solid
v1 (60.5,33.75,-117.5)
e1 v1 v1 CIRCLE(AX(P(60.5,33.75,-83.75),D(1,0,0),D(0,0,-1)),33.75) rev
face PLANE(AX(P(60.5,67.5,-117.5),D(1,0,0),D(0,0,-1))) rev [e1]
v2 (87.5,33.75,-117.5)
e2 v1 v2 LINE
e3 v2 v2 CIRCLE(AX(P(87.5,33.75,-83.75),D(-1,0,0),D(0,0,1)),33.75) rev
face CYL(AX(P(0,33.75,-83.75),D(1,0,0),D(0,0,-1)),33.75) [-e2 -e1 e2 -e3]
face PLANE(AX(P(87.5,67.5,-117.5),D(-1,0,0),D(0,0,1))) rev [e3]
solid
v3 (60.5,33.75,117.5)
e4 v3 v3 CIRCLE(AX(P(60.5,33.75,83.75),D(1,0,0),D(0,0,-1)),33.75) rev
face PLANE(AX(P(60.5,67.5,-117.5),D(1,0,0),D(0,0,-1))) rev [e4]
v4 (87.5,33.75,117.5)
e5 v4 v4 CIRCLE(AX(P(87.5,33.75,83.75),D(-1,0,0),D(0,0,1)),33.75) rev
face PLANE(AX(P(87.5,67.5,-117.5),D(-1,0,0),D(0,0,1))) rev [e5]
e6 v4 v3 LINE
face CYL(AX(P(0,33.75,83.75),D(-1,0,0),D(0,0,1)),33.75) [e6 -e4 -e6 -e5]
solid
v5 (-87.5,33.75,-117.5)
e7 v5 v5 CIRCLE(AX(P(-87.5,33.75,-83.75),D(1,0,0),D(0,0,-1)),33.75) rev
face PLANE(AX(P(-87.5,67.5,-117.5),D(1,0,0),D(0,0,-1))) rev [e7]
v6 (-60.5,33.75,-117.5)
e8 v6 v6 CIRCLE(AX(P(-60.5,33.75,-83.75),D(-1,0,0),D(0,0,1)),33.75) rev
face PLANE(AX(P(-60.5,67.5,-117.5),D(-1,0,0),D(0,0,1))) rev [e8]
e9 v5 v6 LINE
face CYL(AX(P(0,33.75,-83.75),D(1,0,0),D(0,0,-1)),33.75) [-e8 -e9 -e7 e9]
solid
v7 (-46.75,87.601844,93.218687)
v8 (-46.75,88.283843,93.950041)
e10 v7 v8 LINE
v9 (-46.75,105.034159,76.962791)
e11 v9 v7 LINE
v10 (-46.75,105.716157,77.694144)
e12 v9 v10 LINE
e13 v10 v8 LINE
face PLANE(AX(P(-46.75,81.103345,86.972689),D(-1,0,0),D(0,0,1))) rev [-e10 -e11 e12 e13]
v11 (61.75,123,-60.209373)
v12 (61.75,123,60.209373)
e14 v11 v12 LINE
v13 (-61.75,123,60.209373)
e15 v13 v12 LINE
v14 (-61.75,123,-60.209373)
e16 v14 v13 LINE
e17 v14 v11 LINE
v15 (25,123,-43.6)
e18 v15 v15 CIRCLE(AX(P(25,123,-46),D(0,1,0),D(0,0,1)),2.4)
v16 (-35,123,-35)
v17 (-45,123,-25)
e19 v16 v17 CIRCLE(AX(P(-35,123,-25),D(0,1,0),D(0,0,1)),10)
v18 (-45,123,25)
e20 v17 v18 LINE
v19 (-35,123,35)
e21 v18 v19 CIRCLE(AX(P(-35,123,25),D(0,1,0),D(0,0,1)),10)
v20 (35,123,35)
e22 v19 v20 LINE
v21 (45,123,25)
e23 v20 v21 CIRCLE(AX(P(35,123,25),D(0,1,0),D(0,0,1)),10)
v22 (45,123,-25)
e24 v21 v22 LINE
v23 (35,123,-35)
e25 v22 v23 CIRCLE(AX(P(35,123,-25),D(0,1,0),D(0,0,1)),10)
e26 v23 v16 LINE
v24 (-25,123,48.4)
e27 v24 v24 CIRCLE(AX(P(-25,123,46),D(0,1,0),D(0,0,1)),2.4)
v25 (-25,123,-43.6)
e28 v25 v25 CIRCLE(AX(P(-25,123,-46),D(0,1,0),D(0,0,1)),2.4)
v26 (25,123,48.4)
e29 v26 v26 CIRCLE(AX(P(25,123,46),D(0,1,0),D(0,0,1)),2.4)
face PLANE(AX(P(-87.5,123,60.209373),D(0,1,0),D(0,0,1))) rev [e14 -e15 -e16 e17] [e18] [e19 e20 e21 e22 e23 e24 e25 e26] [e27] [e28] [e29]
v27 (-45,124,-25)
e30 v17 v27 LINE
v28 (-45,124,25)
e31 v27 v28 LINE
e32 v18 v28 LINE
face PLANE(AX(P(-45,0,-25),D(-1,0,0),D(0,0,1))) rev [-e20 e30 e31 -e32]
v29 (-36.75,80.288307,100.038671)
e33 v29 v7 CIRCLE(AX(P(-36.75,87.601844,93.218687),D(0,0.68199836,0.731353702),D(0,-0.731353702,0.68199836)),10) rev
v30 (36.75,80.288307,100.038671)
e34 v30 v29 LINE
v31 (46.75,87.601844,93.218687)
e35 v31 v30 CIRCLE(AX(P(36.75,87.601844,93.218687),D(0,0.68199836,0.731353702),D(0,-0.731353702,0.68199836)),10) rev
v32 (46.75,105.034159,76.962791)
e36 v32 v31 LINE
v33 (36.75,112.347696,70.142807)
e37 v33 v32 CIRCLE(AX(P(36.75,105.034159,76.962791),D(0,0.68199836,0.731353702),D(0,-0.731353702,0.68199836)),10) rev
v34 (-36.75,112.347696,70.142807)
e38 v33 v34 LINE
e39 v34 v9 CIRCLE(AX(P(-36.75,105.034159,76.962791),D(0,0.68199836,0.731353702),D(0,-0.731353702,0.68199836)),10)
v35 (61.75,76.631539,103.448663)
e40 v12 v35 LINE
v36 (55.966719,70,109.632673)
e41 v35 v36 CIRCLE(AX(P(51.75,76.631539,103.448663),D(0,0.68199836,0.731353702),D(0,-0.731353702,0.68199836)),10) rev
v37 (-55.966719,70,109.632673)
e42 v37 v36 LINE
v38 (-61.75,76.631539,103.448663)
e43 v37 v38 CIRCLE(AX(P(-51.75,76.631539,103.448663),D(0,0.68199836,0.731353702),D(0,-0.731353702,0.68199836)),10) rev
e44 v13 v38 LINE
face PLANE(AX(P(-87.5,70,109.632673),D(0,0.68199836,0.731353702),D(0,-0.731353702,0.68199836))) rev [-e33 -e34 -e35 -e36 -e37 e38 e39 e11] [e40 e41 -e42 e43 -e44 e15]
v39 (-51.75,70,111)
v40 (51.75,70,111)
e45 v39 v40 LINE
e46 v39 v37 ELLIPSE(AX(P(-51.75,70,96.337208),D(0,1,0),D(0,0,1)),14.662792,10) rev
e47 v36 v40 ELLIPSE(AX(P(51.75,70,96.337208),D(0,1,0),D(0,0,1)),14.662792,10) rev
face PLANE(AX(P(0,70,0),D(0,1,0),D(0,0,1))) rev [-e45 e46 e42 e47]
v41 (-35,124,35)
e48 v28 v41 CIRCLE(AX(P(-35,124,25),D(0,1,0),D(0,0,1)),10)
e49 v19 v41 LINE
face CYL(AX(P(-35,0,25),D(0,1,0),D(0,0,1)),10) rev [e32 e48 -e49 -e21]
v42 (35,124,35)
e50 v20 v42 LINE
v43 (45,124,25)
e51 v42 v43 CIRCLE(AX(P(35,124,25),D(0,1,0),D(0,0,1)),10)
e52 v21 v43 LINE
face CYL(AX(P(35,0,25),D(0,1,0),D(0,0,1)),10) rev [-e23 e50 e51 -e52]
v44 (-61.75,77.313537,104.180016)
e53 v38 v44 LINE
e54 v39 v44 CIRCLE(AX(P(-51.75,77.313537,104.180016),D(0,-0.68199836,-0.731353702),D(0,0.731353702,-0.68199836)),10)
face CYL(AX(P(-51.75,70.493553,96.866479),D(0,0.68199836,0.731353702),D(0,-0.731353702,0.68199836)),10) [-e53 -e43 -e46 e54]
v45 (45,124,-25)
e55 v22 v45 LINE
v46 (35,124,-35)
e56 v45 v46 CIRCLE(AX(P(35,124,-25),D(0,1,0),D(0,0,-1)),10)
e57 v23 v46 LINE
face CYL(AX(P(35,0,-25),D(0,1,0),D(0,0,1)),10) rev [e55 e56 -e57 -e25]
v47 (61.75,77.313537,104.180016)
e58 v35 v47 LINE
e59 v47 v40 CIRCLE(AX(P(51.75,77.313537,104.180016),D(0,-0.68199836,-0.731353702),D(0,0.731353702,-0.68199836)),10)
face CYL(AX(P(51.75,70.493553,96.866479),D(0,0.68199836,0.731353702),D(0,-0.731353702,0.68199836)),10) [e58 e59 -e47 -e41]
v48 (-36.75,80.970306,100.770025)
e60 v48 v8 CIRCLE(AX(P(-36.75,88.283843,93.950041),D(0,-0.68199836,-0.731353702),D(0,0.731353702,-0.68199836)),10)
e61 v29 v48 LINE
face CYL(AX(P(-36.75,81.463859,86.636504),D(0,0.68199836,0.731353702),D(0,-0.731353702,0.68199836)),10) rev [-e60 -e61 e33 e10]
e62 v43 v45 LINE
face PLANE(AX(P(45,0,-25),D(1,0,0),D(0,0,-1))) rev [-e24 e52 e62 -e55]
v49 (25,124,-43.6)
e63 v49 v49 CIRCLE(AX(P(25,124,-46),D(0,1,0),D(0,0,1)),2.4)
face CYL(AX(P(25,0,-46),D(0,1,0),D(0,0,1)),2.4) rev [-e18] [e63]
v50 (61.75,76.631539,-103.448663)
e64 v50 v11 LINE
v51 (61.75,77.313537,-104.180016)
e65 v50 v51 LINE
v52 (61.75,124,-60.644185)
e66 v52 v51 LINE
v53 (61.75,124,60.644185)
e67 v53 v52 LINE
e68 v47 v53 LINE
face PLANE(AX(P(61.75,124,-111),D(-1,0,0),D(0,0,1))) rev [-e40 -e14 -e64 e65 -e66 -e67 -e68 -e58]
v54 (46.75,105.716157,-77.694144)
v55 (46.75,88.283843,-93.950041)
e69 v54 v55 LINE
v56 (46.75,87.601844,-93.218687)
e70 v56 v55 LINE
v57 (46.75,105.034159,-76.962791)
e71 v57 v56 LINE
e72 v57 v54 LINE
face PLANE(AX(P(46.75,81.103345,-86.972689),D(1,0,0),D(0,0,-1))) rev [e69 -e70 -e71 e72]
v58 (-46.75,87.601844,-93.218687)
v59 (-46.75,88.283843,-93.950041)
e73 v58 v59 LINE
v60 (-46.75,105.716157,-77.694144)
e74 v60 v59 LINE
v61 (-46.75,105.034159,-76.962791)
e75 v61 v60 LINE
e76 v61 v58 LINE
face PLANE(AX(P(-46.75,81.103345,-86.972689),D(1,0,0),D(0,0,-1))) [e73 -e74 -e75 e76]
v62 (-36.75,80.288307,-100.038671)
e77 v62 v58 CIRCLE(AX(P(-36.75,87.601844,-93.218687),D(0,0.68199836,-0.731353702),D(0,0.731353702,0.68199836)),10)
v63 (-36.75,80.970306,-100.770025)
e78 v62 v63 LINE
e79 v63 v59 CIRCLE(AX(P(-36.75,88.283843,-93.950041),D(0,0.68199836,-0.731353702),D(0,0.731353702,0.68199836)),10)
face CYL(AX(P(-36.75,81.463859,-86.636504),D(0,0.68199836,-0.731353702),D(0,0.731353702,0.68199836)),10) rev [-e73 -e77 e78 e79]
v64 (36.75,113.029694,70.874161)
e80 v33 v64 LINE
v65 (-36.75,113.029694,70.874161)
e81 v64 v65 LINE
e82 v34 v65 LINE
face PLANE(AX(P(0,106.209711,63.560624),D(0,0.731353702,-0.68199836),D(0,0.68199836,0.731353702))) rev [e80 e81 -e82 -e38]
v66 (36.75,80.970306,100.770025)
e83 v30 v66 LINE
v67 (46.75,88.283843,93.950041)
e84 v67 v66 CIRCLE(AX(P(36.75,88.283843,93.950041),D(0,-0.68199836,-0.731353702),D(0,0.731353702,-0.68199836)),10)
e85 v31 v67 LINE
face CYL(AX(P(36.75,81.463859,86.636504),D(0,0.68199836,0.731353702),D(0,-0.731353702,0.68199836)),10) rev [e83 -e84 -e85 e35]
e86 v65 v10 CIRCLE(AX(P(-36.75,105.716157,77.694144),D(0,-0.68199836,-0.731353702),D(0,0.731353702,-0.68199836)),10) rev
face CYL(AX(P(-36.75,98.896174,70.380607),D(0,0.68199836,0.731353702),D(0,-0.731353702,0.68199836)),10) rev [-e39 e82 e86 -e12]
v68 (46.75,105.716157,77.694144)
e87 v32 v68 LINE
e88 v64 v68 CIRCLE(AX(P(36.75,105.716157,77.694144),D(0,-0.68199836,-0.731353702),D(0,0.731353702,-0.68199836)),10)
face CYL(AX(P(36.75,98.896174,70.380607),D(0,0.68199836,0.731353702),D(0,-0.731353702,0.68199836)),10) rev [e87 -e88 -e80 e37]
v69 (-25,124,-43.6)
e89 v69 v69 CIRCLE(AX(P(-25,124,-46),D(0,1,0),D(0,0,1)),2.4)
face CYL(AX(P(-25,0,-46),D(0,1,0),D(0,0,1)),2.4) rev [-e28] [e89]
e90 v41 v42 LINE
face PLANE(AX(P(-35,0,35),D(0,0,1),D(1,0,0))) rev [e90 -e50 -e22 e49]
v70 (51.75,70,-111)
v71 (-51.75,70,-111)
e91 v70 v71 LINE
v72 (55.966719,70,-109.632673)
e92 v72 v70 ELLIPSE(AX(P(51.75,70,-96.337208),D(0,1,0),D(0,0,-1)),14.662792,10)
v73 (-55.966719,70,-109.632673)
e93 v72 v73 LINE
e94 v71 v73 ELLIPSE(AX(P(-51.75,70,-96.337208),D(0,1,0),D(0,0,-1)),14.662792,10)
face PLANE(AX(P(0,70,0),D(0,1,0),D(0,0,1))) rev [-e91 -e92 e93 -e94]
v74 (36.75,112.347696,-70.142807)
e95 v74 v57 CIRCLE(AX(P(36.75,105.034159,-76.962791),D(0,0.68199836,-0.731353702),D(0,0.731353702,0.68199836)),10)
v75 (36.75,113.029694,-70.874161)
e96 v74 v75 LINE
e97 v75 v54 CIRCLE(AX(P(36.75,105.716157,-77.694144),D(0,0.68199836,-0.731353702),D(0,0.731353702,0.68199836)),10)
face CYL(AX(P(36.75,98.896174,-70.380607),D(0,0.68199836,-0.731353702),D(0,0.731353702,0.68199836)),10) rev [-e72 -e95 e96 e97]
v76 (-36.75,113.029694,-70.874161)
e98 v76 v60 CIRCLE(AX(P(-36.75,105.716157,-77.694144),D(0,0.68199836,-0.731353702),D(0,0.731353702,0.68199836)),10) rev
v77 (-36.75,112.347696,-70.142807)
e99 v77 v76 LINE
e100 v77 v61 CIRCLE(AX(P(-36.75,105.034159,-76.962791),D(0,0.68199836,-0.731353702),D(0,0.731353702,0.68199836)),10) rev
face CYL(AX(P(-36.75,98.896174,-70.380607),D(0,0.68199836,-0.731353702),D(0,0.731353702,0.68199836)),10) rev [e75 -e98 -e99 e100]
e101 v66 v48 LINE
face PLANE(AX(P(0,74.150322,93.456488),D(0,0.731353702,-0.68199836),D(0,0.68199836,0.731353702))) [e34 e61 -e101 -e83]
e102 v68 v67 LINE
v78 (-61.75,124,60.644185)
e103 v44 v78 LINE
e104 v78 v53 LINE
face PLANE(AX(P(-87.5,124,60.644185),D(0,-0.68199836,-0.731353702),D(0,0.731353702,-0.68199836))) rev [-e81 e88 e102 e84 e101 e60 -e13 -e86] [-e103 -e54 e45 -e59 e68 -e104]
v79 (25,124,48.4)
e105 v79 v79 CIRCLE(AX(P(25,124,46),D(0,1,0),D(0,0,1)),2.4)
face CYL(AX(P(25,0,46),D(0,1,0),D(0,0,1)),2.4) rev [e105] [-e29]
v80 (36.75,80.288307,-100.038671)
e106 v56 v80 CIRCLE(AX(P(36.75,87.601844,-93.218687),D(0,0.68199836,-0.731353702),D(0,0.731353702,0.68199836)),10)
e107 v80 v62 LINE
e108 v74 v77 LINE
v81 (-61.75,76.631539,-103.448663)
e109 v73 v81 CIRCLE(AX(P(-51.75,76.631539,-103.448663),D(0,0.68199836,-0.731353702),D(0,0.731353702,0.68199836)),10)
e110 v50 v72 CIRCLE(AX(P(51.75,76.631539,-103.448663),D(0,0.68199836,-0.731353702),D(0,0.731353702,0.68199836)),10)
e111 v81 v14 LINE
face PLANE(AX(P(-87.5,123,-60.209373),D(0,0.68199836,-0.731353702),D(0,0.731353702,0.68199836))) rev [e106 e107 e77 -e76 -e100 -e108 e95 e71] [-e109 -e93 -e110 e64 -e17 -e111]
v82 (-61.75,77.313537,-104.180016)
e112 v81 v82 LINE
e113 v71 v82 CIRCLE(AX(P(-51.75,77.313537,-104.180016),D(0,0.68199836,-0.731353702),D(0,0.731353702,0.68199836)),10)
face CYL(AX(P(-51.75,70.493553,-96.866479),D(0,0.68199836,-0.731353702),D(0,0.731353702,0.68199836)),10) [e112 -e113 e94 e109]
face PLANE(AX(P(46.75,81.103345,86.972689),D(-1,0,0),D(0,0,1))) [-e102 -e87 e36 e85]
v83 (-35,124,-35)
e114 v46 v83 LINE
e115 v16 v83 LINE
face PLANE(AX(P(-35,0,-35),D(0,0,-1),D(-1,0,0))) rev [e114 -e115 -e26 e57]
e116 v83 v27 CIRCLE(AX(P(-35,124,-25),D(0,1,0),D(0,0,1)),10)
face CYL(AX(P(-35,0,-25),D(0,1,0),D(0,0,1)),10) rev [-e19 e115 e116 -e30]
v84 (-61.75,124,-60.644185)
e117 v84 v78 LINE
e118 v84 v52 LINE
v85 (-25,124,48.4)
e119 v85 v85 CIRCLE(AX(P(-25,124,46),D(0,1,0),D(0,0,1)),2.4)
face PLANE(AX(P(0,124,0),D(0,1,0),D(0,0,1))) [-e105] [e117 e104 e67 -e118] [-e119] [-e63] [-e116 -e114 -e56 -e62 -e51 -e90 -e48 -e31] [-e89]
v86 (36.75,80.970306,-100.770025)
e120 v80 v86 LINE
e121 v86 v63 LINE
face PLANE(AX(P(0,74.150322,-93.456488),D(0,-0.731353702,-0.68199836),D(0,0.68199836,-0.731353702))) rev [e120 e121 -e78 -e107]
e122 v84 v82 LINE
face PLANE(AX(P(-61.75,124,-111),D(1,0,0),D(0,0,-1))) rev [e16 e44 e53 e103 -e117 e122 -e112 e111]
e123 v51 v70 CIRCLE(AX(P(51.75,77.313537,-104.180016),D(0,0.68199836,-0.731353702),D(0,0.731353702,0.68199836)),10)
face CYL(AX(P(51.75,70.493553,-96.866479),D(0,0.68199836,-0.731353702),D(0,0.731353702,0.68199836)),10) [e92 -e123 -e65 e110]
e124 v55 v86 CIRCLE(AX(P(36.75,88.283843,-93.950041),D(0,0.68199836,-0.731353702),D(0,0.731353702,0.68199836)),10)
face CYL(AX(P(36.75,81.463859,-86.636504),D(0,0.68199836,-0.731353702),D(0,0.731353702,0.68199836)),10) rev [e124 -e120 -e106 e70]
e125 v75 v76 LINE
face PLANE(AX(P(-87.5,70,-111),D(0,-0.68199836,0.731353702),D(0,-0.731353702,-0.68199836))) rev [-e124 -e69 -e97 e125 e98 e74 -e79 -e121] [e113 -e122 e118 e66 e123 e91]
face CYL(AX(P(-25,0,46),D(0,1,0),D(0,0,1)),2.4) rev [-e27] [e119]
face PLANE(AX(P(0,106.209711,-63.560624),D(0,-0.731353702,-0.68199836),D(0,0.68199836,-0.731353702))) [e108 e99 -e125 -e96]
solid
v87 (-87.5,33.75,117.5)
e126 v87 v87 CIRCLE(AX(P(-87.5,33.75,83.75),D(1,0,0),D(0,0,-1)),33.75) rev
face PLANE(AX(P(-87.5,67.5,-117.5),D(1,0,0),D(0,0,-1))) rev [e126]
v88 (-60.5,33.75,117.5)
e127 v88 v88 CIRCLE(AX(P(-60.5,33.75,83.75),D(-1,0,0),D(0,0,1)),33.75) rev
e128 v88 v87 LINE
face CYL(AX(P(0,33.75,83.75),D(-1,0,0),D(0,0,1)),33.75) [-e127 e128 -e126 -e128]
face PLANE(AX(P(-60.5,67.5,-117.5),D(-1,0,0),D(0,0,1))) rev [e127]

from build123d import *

# Parameters (mm, degrees)
ESBO_O1_W                  = 175
ESBO_O1_H                  = 235
RESSALTO_EXTRUS_O1_DEPTH   = 67.5
FILETE1_R                  = 33.75
CORTE_EXTRUS_O1_DEPTH      = 222.331199789
CORTE_EXTRUS_O2_DEPTH      = 162.303285769
CORTE_EXTRUS_O2_DEPTH_BACK = 162.303285769
ESBO_O3_W                  = 121
ESBO_O3_H                  = 67.5
ESBO_O4_W                  = 123.5
ESBO_O4_H                  = 222
RESSALTO_EXTRUS_O2_DEPTH   = 54
CORTE_EXTRUS_O3_DEPTH      = 227.843145147
ESBO_O7_R                  = 2.4
CORTE_EXTRUS_O4_DEPTH      = 192.933582262
CORTE_EXTRUS_O5_DEPTH      = 10


with BuildPart() as part:
    # Esboço1 → Ressalto-extrusão1 (new body)
    with BuildSketch(Plane(origin=(0, 0, 0), x_dir=(1, 0, 0), z_dir=(0, 1, 0))):
        Rectangle(ESBO_O1_W, ESBO_O1_H)
    extrude(amount=RESSALTO_EXTRUS_O1_DEPTH)

    # Filete1
    filete1_edges = [part.edges().sort_by_distance(p)[0] for p in [
        (0, 0, -117.5),
        (0, 67.5, -117.5),
        (0, 0, 117.5),
        (0, 67.5, 117.5),
    ]]
    fillet(filete1_edges, radius=FILETE1_R - 0.0001)  # a hair under: the kernel refuses the full size

    # Esboço2 → Corte-extrusão1 (cut, through all)
    with BuildSketch(Plane(origin=(87.5, 0, 0), x_dir=(0, 0, -1), z_dir=(1, 0, 0))):
        with BuildLine():
            Line((-83.75, 67.5), (83.75, 67.5))
            ThreePointArc((83.75, 67.5), (50, 33.75), (83.75, 0))
            Line((83.75, 0), (-83.75, 0))
            ThreePointArc((-83.75, 0), (-50, 33.75), (-83.75, 67.5))
        make_face()
    extrude(amount=-CORTE_EXTRUS_O1_DEPTH, mode=Mode.SUBTRACT)


with BuildPart() as corte_extrus_o1_piece_1:
    # of the separate pieces the step leaves, piece 1, a body of its own (corte_extrus_o1_pieces)
    add(part.part.solids().sort_by_distance((-87.5, 33.7499, -117.5))[0])


with BuildPart() as corte_extrus_o1_piece_2:
    # of the separate pieces the step leaves, piece 2, a body of its own (corte_extrus_o1_pieces)
    add(part.part.solids().sort_by_distance((-87.5, 33.7499, 117.5))[0])


with BuildPart() as corte_extrus_o2_tool:
    # Esboço3 → Corte-extrusão2 (new, two sides: drawn at the far end of the back side and taken through both)
    with BuildSketch(Plane.XY.offset(-CORTE_EXTRUS_O2_DEPTH_BACK)):
        with Locations((0, 33.75)):
            Rectangle(ESBO_O3_W, ESBO_O3_H)
    extrude(amount=CORTE_EXTRUS_O2_DEPTH + CORTE_EXTRUS_O2_DEPTH_BACK)


with BuildPart() as corte_extrus_o1_piece_1_1:
    add(corte_extrus_o1_piece_1.part)

    # Corte-extrusão2: cut by corte_extrus_o2_tool
    add(corte_extrus_o2_tool.part, mode=Mode.SUBTRACT)


with BuildPart() as corte_extrus_o1_piece_2_1:
    add(corte_extrus_o1_piece_2.part)

    # Corte-extrusão2: cut by corte_extrus_o2_tool
    add(corte_extrus_o2_tool.part, mode=Mode.SUBTRACT)


with BuildPart() as corte_extrus_o2_piece_1:
    # of the separate pieces the step leaves, piece 1, a body of its own (corte_extrus_o2_pieces)
    add(corte_extrus_o1_piece_1_1.part.solids().sort_by_distance((-87.5, 33.7499, -117.5))[0])


with BuildPart() as corte_extrus_o2_piece_2:
    # of the separate pieces the step leaves, piece 2, a body of its own (corte_extrus_o2_pieces)
    add(corte_extrus_o1_piece_1_1.part.solids().sort_by_distance((60.5, 33.7499, -117.5))[0])


with BuildPart() as corte_extrus_o2_piece_1_of_corte_extrus:
    # of the separate pieces the step leaves, piece 1, a body of its own (corte_extrus_o2_pieces_of_corte_extrus_o)
    add(corte_extrus_o1_piece_2_1.part.solids().sort_by_distance((87.5, 33.7499, 117.5))[0])


with BuildPart() as corte_extrus_o2_piece_2_of_corte_extrus:
    # of the separate pieces the step leaves, piece 2, a body of its own (corte_extrus_o2_pieces_of_corte_extrus_o)
    add(corte_extrus_o1_piece_2_1.part.solids().sort_by_distance((-87.5, 33.7499, 117.5))[0])


with BuildPart() as body_5:
    # Esboço4 → Ressalto-extrusão2 (new body)
    with BuildSketch(Plane(origin=(0, 70, 0), x_dir=(1, 0, 0), z_dir=(0, 1, 0))):
        Rectangle(ESBO_O4_W, ESBO_O4_H)
    extrude(amount=RESSALTO_EXTRUS_O2_DEPTH)

    # Esboço6 → Corte-extrusão3 (cut, through all)
    with BuildSketch(Plane(origin=(61.75, 0, 0), x_dir=(0, 0, -1), z_dir=(1, 0, 0))):
        Polygon((-111, 70), (-111, 124), (-60.644185349, 124), align=None)
        Polygon((111, 124), (111, 70), (60.644185349, 124), align=None)
        Polygon((-109.632672539, 70), (-60.209372974, 123), (60.209372974, 123), (109.632672539, 70), align=None)
    extrude(amount=-CORTE_EXTRUS_O3_DEPTH, mode=Mode.SUBTRACT)

    # Esboço7 → Corte-extrusão4 (cut, through all)
    with BuildSketch(Plane(origin=(0, 124, 0), x_dir=(1, 0, 0), z_dir=(0, 1, 0))):
        with Locations(Location((-25, -46, 0), (0, 0, 270))):
            Circle(ESBO_O7_R)
        with Locations(Location((25, -46, 0), (0, 0, 270))):
            Circle(ESBO_O7_R)
        with Locations(Location((-25, 46, 0), (0, 0, 270))):
            Circle(ESBO_O7_R)
        with Locations(Location((25, 46, 0), (0, 0, 270))):
            Circle(ESBO_O7_R)
        with BuildLine():
            Line((-35, 35), (35, 35))
            ThreePointArc((35, 35), (42.071067812, 32.071067812), (45, 25))
            Line((45, 25), (45, -25))
            ThreePointArc((45, -25), (42.071067812, -32.071067812), (35, -35))
            Line((35, -35), (-35, -35))
            ThreePointArc((-35, -35), (-42.071067812, -32.071067812), (-45, -25))
            Line((-45, -25), (-45, 25))
            ThreePointArc((-45, 25), (-42.071067812, 32.071067812), (-35, 35))
        make_face()
    extrude(amount=-CORTE_EXTRUS_O4_DEPTH, mode=Mode.SUBTRACT)

    # Esboço8 → Corte-extrusão5 (cut)
    with BuildSketch(Plane(origin=(0, 87.923328208, -94.286226052), x_dir=(-1, 0, 0), z_dir=(0, 0.6819983600624947, -0.731353701619174))):
        with BuildLine():
            Line((-36.75, 34.328624046), (36.75, 34.328624046))
            ThreePointArc((36.75, 34.328624046), (43.821067812, 31.399691858), (46.75, 24.328624046))
            Line((46.75, 24.328624046), (46.75, 0.492941146))
            ThreePointArc((46.75, 0.492941146), (43.821067812, -6.578126665), (36.75, -9.507058854))
            Line((36.75, -9.507058854), (-36.75, -9.507058854))
            ThreePointArc((-36.75, -9.507058854), (-43.821067812, -6.578126665), (-46.75, 0.492941146))
            Line((-46.75, 0.492941146), (-46.75, 24.328624046))
            ThreePointArc((-46.75, 24.328624046), (-43.821067812, 31.399691858), (-36.75, 34.328624046))
        make_face()
        with BuildLine():
            Line((-61.75, -24.507058854), (-51.75, -24.507058854))
            ThreePointArc((-51.75, -24.507058854), (-58.821067812, -21.578126665), (-61.75, -14.507058854))
            Line((-61.75, -14.507058854), (-61.75, -24.507058854))
        make_face()
        with BuildLine():
            ThreePointArc((61.75, -14.507058854), (58.821067812, -21.578126665), (51.75, -24.507058854))
            Line((51.75, -24.507058854), (61.75, -24.507058854))
            Line((61.75, -24.507058854), (61.75, -14.507058854))
        make_face()
    corte_extrus_o5 = extrude(amount=-CORTE_EXTRUS_O5_DEPTH, mode=Mode.SUBTRACT)

    # Espelhar1: Corte-extrusão5 across plane
    add(corte_extrus_o5.mirror(Plane.XY), mode=Mode.SUBTRACT)


solid = Compound([corte_extrus_o2_piece_1.part, corte_extrus_o2_piece_2.part, corte_extrus_o2_piece_1_of_corte_extrus.part, corte_extrus_o2_piece_2_of_corte_extrus.part, body_5.part])
